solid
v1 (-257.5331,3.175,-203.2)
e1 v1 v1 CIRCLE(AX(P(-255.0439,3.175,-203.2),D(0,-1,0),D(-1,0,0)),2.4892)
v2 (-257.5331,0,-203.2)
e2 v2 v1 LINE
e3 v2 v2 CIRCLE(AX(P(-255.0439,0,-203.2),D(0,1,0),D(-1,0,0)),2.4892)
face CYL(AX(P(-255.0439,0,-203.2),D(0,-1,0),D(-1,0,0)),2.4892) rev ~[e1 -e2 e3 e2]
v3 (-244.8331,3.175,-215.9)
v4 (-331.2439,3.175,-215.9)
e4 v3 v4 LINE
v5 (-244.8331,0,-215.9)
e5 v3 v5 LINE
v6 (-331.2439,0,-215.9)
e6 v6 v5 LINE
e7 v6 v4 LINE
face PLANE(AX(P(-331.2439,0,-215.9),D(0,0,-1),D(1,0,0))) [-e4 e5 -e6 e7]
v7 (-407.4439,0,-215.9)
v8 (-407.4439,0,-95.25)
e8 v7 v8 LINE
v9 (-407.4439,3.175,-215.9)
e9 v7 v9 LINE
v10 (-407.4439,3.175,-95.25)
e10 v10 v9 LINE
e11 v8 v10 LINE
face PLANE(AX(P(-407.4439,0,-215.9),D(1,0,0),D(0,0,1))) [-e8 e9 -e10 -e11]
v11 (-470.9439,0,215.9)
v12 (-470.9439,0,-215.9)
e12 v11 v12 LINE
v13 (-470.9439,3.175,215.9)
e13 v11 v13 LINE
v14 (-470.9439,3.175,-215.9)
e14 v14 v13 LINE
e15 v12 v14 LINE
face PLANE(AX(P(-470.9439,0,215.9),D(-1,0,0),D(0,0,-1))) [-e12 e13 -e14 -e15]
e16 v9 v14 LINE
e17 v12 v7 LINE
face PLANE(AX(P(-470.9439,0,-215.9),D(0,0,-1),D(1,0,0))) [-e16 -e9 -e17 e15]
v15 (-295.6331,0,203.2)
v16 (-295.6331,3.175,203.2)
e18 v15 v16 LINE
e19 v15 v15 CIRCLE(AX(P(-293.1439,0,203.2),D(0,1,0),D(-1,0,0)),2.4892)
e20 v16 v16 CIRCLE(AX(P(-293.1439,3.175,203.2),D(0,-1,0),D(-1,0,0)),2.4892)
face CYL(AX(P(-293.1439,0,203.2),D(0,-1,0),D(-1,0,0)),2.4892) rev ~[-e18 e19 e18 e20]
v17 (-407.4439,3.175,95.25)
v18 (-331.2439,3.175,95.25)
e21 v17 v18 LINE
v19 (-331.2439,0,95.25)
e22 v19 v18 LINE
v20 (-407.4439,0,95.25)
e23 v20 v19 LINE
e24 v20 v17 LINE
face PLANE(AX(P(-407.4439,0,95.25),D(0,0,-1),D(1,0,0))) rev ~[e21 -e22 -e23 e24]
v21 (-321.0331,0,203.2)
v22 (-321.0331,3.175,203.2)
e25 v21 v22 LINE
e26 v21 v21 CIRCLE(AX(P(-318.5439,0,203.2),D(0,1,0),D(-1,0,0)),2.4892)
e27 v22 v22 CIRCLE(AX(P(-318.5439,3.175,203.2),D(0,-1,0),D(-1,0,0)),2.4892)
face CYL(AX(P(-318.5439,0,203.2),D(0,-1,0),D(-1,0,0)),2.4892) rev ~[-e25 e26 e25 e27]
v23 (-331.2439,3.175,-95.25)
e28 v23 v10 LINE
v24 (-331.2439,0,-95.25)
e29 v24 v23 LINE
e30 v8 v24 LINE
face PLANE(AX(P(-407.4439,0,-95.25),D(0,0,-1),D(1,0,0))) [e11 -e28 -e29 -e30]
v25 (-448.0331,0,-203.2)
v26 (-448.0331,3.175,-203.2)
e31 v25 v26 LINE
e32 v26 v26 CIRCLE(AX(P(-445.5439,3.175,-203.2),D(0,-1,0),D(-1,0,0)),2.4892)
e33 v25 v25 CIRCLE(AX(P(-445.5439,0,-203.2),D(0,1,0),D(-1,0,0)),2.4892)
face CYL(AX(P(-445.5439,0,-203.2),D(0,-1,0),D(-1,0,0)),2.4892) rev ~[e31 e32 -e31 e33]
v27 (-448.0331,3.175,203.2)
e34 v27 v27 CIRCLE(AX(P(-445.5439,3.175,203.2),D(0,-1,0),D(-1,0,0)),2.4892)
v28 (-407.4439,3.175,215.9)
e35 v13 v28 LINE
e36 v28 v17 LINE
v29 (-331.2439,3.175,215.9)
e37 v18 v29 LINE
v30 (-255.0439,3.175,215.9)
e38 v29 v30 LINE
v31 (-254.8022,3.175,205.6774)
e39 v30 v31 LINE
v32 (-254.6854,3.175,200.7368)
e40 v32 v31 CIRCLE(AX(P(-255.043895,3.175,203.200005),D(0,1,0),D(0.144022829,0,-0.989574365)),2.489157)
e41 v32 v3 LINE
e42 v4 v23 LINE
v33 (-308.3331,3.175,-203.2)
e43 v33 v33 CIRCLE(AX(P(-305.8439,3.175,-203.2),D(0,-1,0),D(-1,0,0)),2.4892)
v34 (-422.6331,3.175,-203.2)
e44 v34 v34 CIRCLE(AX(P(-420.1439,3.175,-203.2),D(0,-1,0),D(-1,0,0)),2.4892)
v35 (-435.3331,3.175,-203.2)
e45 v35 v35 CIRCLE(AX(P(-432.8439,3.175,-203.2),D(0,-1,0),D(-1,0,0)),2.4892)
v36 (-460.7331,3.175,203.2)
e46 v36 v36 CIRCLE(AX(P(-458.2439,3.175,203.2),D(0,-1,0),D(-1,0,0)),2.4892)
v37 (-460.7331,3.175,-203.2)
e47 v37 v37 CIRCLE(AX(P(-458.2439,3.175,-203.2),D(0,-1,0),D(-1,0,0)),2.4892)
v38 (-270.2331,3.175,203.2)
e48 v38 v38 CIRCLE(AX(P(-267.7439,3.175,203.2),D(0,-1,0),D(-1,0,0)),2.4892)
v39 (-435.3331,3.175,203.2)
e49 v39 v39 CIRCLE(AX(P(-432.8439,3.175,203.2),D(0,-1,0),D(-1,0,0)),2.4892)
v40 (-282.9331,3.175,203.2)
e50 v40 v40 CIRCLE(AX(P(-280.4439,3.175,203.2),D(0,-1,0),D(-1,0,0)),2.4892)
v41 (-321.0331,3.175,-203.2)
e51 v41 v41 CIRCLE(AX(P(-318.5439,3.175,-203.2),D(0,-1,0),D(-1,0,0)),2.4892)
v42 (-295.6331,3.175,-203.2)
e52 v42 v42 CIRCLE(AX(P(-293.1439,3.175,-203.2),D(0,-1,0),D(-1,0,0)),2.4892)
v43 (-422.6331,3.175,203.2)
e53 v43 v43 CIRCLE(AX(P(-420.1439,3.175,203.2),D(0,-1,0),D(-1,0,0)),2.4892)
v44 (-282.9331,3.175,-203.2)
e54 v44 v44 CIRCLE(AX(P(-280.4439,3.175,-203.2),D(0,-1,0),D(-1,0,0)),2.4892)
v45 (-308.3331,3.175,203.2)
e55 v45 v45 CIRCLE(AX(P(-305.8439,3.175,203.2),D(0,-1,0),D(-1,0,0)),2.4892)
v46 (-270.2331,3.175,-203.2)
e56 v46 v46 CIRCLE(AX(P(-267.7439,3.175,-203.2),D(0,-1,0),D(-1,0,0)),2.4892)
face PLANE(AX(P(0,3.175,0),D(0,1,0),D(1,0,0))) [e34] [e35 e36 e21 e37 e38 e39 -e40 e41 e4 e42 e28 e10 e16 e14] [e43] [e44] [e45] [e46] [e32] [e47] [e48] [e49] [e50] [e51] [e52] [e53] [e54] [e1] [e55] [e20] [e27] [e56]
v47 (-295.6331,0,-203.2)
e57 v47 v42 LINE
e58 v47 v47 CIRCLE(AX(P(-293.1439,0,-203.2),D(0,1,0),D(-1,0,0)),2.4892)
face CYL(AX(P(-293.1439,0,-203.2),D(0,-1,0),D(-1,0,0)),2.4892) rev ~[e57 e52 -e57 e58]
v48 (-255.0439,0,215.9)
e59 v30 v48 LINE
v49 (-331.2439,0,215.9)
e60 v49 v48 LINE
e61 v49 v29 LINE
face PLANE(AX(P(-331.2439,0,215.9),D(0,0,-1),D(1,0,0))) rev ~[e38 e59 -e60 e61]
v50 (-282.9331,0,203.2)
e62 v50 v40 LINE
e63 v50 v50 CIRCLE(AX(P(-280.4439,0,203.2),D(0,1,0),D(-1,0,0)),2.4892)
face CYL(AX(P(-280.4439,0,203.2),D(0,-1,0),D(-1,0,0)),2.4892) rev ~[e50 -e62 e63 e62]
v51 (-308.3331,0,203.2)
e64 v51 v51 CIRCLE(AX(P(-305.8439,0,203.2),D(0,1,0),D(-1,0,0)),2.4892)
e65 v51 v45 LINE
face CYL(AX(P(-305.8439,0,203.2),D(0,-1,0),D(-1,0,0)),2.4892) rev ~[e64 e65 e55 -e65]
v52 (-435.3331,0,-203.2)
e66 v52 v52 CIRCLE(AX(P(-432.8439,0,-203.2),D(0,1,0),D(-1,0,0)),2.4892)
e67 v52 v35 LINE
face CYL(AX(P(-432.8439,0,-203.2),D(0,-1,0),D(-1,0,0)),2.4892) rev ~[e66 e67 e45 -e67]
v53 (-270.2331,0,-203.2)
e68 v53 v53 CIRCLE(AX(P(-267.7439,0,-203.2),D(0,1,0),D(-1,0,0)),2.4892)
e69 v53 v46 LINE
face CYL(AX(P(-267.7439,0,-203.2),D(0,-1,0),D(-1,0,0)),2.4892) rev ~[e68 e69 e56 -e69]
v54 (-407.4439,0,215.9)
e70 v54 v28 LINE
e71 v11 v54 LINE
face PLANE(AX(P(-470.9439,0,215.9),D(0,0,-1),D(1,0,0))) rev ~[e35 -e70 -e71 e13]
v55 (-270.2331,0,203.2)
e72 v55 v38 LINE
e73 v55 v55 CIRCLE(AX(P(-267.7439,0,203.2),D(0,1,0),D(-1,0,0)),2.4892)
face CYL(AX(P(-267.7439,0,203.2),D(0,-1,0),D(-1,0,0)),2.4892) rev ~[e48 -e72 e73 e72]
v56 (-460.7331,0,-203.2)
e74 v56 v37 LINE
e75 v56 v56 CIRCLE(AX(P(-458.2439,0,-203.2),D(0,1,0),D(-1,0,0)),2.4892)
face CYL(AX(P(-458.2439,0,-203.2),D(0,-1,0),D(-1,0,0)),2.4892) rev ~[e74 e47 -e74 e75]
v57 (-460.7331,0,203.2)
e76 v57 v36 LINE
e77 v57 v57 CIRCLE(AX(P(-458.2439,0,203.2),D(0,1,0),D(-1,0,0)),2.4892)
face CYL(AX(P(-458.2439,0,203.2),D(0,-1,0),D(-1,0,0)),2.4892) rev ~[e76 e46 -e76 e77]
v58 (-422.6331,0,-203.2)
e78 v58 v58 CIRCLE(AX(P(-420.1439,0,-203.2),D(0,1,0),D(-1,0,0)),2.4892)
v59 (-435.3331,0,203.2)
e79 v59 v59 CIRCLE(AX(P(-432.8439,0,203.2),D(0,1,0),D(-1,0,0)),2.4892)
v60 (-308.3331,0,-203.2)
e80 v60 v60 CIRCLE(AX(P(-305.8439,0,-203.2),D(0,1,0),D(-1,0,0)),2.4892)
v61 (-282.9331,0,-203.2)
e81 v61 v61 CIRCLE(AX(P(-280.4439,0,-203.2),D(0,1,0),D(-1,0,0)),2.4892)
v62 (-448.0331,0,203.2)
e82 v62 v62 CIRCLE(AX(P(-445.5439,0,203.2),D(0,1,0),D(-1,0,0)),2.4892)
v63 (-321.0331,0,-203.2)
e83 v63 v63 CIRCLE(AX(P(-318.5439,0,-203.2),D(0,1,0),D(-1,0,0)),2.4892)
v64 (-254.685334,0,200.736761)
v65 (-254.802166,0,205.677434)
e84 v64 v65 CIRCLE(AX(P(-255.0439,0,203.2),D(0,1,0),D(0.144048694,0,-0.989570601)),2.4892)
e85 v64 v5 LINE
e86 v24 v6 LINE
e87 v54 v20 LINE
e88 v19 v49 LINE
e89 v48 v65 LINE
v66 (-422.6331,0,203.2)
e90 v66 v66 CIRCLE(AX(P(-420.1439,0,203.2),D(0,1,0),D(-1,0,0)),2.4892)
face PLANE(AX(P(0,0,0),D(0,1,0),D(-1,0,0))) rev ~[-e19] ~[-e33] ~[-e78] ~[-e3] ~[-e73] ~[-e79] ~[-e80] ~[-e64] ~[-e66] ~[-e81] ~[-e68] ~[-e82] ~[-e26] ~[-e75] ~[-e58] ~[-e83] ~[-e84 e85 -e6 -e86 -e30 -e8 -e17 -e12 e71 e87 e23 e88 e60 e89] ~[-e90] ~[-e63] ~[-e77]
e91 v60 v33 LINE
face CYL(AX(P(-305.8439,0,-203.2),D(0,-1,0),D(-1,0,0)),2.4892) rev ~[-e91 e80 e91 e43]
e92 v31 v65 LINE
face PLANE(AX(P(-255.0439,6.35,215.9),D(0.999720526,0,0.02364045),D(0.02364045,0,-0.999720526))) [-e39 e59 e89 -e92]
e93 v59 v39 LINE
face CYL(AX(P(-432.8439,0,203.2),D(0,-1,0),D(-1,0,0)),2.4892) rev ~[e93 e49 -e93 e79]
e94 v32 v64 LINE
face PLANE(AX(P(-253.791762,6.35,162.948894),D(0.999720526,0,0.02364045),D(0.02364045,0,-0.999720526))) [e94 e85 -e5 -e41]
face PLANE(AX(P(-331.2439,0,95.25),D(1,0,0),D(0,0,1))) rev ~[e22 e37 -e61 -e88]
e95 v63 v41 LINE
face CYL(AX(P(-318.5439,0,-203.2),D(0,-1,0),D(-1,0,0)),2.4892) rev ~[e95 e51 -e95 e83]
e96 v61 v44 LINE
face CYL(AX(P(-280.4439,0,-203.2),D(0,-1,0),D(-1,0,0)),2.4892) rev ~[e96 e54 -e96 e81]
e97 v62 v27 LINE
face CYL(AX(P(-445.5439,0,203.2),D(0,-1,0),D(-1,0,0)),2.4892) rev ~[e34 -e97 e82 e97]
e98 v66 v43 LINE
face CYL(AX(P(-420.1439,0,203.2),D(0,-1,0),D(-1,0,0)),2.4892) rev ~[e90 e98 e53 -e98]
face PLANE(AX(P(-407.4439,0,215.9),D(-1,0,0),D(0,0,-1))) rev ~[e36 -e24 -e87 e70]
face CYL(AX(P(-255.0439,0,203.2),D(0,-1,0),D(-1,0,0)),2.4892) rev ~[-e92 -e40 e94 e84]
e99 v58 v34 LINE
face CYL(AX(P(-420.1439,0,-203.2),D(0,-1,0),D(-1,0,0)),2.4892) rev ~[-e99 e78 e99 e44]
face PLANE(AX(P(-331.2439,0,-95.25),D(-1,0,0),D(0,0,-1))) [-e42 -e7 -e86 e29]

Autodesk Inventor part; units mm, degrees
ref_plane "YZ Plane" through (0, 0, 0) normal (1, 0, 0) x (0, 1, 0)
ref_plane "XZ Plane" through (0, 0, 0) normal (0, 1, 0) x (-1, 0, 0)
ref_plane "XY Plane" through (0, 0, 0) normal (0, 0, 1) x (1, 0, 0)
sketch "Sketch1" plane through (0, 0, 0) normal (0, 1, 0) x (-1, 0, 0)
  arc A0 (210.5939, -215.9) -> (210.5939, 215.9) centre (0, 0) ccw
  line L0 (470.9439, 215.9) -> (470.9439, -215.9)
  line L1 (470.9439, 215.9) -> (407.4439, 215.9)
  line L2 (407.4439, 215.9) -> (407.4439, 95.25)
  line L3 (407.4439, 95.25) -> (331.2439, 95.25)
  line L4 (331.2439, 95.25) -> (331.2439, 215.9)
  line L5 (470.9439, -215.9) -> (407.4439, -215.9)
  line L6 (407.4439, -215.9) -> (407.4439, -95.25)
  line L7 (407.4439, -95.25) -> (331.2439, -95.25)
  line L8 (331.2439, -95.25) -> (331.2439, -215.9)
  line L9 (331.2439, 215.9) -> (210.5939, 215.9)
  line L10 (331.2439, -215.9) -> (210.5939, -215.9)
  circle A1 centre (458.2439, 203.2) radius 2.4892
  circle A2 centre (445.5439, 203.2) radius 2.4892
  circle A3 centre (432.8439, 203.2) radius 2.4892
  circle A4 centre (420.1439, 203.2) radius 2.4892
  circle A5 centre (318.5439, 203.2) radius 2.4892
  circle A6 centre (305.8439, 203.2) radius 2.4892
  circle A7 centre (293.1439, 203.2) radius 2.4892
  circle A8 centre (280.4439, 203.2) radius 2.4892
  circle A9 centre (267.7439, 203.2) radius 2.4892
  circle A10 centre (255.0439, 203.2) radius 2.4892
  circle A11 centre (242.3439, 203.2) radius 2.4892
  circle A12 centre (229.6439, 203.2) radius 2.4892
  line L11 (597.6164, 0) -> (168.2721, 0) construction
  circle A13 centre (458.2439, -203.2) radius 2.4892
  circle A14 centre (445.5439, -203.2) radius 2.4892
  circle A15 centre (432.8439, -203.2) radius 2.4892
  circle A16 centre (420.1439, -203.2) radius 2.4892
  circle A17 centre (318.5439, -203.2) radius 2.4892
  circle A18 centre (305.8439, -203.2) radius 2.4892
  circle A19 centre (293.1439, -203.2) radius 2.4892
  circle A20 centre (280.4439, -203.2) radius 2.4892
  circle A21 centre (267.7439, -203.2) radius 2.4892
  circle A22 centre (255.0439, -203.2) radius 2.4892
  circle A23 centre (242.3439, -203.2) radius 2.4892
  circle A24 centre (229.6439, -203.2) radius 2.4892
  dimension "d0" = 603.2002
  dimension "d1" = 431.8
  dimension "d2" = 63.5
  dimension "d3" = 120.65
  dimension "d4" = 76.2
  dimension "d5" = 63.5
  dimension "d6" = 120.65
  dimension "d7" = 76.2
  dimension "d8" = 120.65
  dimension "d9" = 120.65
  dimension "d10" = 4.9784
  dimension "d11" = 12.7
  dimension "d12" = 12.7
  dimension "d15" = 12.7
  dimension "d20" = 4.9784
  dimension "d21" = 12.7
  dimension "d22" = 12.7
  dimension "d25" = 12.7
  dimension "d30" = 12.7
extrude "Extrusion1" add sketch "Sketch1" along normal blind 6.35
sketch "Sketch2" plane through (0, 6.35, 0) normal (0, 1, 0) x (1, 0, 0)
  line L0 (-407.4439, -215.9) -> (-407.4439, -95.25) projected
  line L1 (-407.4439, -95.25) -> (-331.2439, -95.25) projected
  line L2 (-331.2439, -95.25) -> (-331.2439, -215.9) projected
  line L3 (-331.2439, -215.9) -> (-210.5939, -215.9) projected
  arc A0 (-210.5939, 215.9) -> (-210.5939, -215.9) centre (0, 0) ccw projected
  line L4 (-210.5939, 215.9) -> (-331.2439, 215.9) projected
  line L5 (-331.2439, 215.9) -> (-331.2439, 95.25) projected
  line L6 (-331.2439, 95.25) -> (-407.4439, 95.25) projected
  line L7 (-407.4439, 95.25) -> (-407.4439, 215.9) projected
  line L8 (-407.4439, 215.9) -> (-470.9439, 215.9) projected
  line L9 (-470.9439, 215.9) -> (-470.9439, -215.9) projected
  line L10 (-470.9439, -215.9) -> (-407.4439, -215.9) projected
  circle A1 centre (-305.8439, 203.2) radius 2.4892 projected
  circle A2 centre (-458.2439, 203.2) radius 2.4892 projected
  circle A3 centre (-432.8439, 203.2) radius 2.4892 projected
  circle A4 centre (-420.1439, 203.2) radius 2.4892 projected
  circle A5 centre (-305.8439, -203.2) radius 2.4892 projected
  circle A6 centre (-318.5439, -203.2) radius 2.4892 projected
  circle A7 centre (-420.1439, -203.2) radius 2.4892 projected
  circle A8 centre (-432.8439, -203.2) radius 2.4892 projected
  circle A9 centre (-445.5439, -203.2) radius 2.4892 projected
  circle A10 centre (-458.2439, -203.2) radius 2.4892 projected
  circle A11 centre (-445.5439, 203.2) radius 2.4892 projected
  circle A12 centre (-318.5439, 203.2) radius 2.4892 projected
  circle A13 centre (-293.1439, 203.2) radius 2.4892 projected
  circle A14 centre (-280.4439, 203.2) radius 2.4892 projected
  circle A15 centre (-267.7439, 203.2) radius 2.4892 projected
  circle A16 centre (-255.0439, 203.2) radius 2.4892 projected
  circle A17 centre (-242.3439, 203.2) radius 2.4892 projected
  circle A18 centre (-229.6439, 203.2) radius 2.4892 projected
  circle A19 centre (-229.6439, -203.2) radius 2.4892 projected
  circle A20 centre (-242.3439, -203.2) radius 2.4892 projected
  circle A21 centre (-255.0439, -203.2) radius 2.4892 projected
  circle A22 centre (-267.7439, -203.2) radius 2.4892 projected
  circle A23 centre (-280.4439, -203.2) radius 2.4892 projected
  circle A24 centre (-293.1439, -203.2) radius 2.4892 projected
  line L11 (-470.9439, -215.9) -> (-255.0439, -215.9)
  line L12 (-255.0439, -215.9) -> (-244.8331, 215.9)
  point P0 (-253.7918, -162.9489)
  point P1 (-245.8059, 174.7629)
  dimension "d33" = 215.9
extrude "Extrusion2" add sketch "Sketch2" against normal up to surface (6.35 mm away) contours A0 L12
extrude "Extrusion3" cut sketch "Sketch2" against normal blind 25.4 contours L12 A21 A0 L3 | L12 A21 | L12 L4 A0 picked at (-254.0374, -203.0094)
sketch "Sketch3" plane through (0, 6.35, 0) normal (0, 1, 0) x (1, 0, 0)
  line L0 (-254.6854, -200.7368) -> (-244.8331, 215.9) projected
  line L1 (-244.8331, 215.9) -> (-331.2439, 215.9) projected
  line L2 (-331.2439, 215.9) -> (-331.2439, 95.25) projected
  line L3 (-331.2439, 95.25) -> (-407.4439, 95.25) projected
  line L4 (-407.4439, 95.25) -> (-407.4439, 215.9) projected
  line L5 (-407.4439, 215.9) -> (-470.9439, 215.9) projected
  line L6 (-470.9439, 215.9) -> (-470.9439, -215.9) projected
  line L7 (-470.9439, -215.9) -> (-407.4439, -215.9) projected
  line L8 (-407.4439, -215.9) -> (-407.4439, -95.25) projected
  line L9 (-407.4439, -95.25) -> (-331.2439, -95.25) projected
  line L10 (-331.2439, -95.25) -> (-331.2439, -215.9) projected
  line L11 (-331.2439, -215.9) -> (-255.0439, -215.9) projected
  line L12 (-255.0439, -215.9) -> (-254.8022, -205.6774) projected
  arc A0 (-254.6854, -200.7368) -> (-254.8022, -205.6774) centre (-255.0439, -203.2) ccw projected
  circle A1 centre (-305.8439, 203.2) radius 2.4892 projected
  circle A2 centre (-458.2439, 203.2) radius 2.4892 projected
  circle A3 centre (-432.8439, 203.2) radius 2.4892 projected
  circle A4 centre (-420.1439, 203.2) radius 2.4892 projected
  circle A5 centre (-305.8439, -203.2) radius 2.4892 projected
  circle A6 centre (-318.5439, -203.2) radius 2.4892 projected
  circle A7 centre (-420.1439, -203.2) radius 2.4892 projected
  circle A8 centre (-432.8439, -203.2) radius 2.4892 projected
  circle A9 centre (-445.5439, -203.2) radius 2.4892 projected
  circle A10 centre (-458.2439, -203.2) radius 2.4892 projected
  circle A11 centre (-445.5439, 203.2) radius 2.4892 projected
  circle A12 centre (-318.5439, 203.2) radius 2.4892 projected
  circle A13 centre (-293.1439, 203.2) radius 2.4892 projected
  circle A14 centre (-280.4439, 203.2) radius 2.4892 projected
  circle A15 centre (-267.7439, 203.2) radius 2.4892 projected
  circle A16 centre (-255.0439, 203.2) radius 2.4892 projected
  circle A17 centre (-267.7439, -203.2) radius 2.4892 projected
  circle A18 centre (-280.4439, -203.2) radius 2.4892 projected
  circle A19 centre (-293.1439, -203.2) radius 2.4892 projected
  point P0 (0, 0)
extrude "Extrusion4" cut sketch "Sketch3" against normal blind 3.175
properties part number "Polycarbonate-Note-Intakaur-Cover" material "Polycarbonate, Smoke"
